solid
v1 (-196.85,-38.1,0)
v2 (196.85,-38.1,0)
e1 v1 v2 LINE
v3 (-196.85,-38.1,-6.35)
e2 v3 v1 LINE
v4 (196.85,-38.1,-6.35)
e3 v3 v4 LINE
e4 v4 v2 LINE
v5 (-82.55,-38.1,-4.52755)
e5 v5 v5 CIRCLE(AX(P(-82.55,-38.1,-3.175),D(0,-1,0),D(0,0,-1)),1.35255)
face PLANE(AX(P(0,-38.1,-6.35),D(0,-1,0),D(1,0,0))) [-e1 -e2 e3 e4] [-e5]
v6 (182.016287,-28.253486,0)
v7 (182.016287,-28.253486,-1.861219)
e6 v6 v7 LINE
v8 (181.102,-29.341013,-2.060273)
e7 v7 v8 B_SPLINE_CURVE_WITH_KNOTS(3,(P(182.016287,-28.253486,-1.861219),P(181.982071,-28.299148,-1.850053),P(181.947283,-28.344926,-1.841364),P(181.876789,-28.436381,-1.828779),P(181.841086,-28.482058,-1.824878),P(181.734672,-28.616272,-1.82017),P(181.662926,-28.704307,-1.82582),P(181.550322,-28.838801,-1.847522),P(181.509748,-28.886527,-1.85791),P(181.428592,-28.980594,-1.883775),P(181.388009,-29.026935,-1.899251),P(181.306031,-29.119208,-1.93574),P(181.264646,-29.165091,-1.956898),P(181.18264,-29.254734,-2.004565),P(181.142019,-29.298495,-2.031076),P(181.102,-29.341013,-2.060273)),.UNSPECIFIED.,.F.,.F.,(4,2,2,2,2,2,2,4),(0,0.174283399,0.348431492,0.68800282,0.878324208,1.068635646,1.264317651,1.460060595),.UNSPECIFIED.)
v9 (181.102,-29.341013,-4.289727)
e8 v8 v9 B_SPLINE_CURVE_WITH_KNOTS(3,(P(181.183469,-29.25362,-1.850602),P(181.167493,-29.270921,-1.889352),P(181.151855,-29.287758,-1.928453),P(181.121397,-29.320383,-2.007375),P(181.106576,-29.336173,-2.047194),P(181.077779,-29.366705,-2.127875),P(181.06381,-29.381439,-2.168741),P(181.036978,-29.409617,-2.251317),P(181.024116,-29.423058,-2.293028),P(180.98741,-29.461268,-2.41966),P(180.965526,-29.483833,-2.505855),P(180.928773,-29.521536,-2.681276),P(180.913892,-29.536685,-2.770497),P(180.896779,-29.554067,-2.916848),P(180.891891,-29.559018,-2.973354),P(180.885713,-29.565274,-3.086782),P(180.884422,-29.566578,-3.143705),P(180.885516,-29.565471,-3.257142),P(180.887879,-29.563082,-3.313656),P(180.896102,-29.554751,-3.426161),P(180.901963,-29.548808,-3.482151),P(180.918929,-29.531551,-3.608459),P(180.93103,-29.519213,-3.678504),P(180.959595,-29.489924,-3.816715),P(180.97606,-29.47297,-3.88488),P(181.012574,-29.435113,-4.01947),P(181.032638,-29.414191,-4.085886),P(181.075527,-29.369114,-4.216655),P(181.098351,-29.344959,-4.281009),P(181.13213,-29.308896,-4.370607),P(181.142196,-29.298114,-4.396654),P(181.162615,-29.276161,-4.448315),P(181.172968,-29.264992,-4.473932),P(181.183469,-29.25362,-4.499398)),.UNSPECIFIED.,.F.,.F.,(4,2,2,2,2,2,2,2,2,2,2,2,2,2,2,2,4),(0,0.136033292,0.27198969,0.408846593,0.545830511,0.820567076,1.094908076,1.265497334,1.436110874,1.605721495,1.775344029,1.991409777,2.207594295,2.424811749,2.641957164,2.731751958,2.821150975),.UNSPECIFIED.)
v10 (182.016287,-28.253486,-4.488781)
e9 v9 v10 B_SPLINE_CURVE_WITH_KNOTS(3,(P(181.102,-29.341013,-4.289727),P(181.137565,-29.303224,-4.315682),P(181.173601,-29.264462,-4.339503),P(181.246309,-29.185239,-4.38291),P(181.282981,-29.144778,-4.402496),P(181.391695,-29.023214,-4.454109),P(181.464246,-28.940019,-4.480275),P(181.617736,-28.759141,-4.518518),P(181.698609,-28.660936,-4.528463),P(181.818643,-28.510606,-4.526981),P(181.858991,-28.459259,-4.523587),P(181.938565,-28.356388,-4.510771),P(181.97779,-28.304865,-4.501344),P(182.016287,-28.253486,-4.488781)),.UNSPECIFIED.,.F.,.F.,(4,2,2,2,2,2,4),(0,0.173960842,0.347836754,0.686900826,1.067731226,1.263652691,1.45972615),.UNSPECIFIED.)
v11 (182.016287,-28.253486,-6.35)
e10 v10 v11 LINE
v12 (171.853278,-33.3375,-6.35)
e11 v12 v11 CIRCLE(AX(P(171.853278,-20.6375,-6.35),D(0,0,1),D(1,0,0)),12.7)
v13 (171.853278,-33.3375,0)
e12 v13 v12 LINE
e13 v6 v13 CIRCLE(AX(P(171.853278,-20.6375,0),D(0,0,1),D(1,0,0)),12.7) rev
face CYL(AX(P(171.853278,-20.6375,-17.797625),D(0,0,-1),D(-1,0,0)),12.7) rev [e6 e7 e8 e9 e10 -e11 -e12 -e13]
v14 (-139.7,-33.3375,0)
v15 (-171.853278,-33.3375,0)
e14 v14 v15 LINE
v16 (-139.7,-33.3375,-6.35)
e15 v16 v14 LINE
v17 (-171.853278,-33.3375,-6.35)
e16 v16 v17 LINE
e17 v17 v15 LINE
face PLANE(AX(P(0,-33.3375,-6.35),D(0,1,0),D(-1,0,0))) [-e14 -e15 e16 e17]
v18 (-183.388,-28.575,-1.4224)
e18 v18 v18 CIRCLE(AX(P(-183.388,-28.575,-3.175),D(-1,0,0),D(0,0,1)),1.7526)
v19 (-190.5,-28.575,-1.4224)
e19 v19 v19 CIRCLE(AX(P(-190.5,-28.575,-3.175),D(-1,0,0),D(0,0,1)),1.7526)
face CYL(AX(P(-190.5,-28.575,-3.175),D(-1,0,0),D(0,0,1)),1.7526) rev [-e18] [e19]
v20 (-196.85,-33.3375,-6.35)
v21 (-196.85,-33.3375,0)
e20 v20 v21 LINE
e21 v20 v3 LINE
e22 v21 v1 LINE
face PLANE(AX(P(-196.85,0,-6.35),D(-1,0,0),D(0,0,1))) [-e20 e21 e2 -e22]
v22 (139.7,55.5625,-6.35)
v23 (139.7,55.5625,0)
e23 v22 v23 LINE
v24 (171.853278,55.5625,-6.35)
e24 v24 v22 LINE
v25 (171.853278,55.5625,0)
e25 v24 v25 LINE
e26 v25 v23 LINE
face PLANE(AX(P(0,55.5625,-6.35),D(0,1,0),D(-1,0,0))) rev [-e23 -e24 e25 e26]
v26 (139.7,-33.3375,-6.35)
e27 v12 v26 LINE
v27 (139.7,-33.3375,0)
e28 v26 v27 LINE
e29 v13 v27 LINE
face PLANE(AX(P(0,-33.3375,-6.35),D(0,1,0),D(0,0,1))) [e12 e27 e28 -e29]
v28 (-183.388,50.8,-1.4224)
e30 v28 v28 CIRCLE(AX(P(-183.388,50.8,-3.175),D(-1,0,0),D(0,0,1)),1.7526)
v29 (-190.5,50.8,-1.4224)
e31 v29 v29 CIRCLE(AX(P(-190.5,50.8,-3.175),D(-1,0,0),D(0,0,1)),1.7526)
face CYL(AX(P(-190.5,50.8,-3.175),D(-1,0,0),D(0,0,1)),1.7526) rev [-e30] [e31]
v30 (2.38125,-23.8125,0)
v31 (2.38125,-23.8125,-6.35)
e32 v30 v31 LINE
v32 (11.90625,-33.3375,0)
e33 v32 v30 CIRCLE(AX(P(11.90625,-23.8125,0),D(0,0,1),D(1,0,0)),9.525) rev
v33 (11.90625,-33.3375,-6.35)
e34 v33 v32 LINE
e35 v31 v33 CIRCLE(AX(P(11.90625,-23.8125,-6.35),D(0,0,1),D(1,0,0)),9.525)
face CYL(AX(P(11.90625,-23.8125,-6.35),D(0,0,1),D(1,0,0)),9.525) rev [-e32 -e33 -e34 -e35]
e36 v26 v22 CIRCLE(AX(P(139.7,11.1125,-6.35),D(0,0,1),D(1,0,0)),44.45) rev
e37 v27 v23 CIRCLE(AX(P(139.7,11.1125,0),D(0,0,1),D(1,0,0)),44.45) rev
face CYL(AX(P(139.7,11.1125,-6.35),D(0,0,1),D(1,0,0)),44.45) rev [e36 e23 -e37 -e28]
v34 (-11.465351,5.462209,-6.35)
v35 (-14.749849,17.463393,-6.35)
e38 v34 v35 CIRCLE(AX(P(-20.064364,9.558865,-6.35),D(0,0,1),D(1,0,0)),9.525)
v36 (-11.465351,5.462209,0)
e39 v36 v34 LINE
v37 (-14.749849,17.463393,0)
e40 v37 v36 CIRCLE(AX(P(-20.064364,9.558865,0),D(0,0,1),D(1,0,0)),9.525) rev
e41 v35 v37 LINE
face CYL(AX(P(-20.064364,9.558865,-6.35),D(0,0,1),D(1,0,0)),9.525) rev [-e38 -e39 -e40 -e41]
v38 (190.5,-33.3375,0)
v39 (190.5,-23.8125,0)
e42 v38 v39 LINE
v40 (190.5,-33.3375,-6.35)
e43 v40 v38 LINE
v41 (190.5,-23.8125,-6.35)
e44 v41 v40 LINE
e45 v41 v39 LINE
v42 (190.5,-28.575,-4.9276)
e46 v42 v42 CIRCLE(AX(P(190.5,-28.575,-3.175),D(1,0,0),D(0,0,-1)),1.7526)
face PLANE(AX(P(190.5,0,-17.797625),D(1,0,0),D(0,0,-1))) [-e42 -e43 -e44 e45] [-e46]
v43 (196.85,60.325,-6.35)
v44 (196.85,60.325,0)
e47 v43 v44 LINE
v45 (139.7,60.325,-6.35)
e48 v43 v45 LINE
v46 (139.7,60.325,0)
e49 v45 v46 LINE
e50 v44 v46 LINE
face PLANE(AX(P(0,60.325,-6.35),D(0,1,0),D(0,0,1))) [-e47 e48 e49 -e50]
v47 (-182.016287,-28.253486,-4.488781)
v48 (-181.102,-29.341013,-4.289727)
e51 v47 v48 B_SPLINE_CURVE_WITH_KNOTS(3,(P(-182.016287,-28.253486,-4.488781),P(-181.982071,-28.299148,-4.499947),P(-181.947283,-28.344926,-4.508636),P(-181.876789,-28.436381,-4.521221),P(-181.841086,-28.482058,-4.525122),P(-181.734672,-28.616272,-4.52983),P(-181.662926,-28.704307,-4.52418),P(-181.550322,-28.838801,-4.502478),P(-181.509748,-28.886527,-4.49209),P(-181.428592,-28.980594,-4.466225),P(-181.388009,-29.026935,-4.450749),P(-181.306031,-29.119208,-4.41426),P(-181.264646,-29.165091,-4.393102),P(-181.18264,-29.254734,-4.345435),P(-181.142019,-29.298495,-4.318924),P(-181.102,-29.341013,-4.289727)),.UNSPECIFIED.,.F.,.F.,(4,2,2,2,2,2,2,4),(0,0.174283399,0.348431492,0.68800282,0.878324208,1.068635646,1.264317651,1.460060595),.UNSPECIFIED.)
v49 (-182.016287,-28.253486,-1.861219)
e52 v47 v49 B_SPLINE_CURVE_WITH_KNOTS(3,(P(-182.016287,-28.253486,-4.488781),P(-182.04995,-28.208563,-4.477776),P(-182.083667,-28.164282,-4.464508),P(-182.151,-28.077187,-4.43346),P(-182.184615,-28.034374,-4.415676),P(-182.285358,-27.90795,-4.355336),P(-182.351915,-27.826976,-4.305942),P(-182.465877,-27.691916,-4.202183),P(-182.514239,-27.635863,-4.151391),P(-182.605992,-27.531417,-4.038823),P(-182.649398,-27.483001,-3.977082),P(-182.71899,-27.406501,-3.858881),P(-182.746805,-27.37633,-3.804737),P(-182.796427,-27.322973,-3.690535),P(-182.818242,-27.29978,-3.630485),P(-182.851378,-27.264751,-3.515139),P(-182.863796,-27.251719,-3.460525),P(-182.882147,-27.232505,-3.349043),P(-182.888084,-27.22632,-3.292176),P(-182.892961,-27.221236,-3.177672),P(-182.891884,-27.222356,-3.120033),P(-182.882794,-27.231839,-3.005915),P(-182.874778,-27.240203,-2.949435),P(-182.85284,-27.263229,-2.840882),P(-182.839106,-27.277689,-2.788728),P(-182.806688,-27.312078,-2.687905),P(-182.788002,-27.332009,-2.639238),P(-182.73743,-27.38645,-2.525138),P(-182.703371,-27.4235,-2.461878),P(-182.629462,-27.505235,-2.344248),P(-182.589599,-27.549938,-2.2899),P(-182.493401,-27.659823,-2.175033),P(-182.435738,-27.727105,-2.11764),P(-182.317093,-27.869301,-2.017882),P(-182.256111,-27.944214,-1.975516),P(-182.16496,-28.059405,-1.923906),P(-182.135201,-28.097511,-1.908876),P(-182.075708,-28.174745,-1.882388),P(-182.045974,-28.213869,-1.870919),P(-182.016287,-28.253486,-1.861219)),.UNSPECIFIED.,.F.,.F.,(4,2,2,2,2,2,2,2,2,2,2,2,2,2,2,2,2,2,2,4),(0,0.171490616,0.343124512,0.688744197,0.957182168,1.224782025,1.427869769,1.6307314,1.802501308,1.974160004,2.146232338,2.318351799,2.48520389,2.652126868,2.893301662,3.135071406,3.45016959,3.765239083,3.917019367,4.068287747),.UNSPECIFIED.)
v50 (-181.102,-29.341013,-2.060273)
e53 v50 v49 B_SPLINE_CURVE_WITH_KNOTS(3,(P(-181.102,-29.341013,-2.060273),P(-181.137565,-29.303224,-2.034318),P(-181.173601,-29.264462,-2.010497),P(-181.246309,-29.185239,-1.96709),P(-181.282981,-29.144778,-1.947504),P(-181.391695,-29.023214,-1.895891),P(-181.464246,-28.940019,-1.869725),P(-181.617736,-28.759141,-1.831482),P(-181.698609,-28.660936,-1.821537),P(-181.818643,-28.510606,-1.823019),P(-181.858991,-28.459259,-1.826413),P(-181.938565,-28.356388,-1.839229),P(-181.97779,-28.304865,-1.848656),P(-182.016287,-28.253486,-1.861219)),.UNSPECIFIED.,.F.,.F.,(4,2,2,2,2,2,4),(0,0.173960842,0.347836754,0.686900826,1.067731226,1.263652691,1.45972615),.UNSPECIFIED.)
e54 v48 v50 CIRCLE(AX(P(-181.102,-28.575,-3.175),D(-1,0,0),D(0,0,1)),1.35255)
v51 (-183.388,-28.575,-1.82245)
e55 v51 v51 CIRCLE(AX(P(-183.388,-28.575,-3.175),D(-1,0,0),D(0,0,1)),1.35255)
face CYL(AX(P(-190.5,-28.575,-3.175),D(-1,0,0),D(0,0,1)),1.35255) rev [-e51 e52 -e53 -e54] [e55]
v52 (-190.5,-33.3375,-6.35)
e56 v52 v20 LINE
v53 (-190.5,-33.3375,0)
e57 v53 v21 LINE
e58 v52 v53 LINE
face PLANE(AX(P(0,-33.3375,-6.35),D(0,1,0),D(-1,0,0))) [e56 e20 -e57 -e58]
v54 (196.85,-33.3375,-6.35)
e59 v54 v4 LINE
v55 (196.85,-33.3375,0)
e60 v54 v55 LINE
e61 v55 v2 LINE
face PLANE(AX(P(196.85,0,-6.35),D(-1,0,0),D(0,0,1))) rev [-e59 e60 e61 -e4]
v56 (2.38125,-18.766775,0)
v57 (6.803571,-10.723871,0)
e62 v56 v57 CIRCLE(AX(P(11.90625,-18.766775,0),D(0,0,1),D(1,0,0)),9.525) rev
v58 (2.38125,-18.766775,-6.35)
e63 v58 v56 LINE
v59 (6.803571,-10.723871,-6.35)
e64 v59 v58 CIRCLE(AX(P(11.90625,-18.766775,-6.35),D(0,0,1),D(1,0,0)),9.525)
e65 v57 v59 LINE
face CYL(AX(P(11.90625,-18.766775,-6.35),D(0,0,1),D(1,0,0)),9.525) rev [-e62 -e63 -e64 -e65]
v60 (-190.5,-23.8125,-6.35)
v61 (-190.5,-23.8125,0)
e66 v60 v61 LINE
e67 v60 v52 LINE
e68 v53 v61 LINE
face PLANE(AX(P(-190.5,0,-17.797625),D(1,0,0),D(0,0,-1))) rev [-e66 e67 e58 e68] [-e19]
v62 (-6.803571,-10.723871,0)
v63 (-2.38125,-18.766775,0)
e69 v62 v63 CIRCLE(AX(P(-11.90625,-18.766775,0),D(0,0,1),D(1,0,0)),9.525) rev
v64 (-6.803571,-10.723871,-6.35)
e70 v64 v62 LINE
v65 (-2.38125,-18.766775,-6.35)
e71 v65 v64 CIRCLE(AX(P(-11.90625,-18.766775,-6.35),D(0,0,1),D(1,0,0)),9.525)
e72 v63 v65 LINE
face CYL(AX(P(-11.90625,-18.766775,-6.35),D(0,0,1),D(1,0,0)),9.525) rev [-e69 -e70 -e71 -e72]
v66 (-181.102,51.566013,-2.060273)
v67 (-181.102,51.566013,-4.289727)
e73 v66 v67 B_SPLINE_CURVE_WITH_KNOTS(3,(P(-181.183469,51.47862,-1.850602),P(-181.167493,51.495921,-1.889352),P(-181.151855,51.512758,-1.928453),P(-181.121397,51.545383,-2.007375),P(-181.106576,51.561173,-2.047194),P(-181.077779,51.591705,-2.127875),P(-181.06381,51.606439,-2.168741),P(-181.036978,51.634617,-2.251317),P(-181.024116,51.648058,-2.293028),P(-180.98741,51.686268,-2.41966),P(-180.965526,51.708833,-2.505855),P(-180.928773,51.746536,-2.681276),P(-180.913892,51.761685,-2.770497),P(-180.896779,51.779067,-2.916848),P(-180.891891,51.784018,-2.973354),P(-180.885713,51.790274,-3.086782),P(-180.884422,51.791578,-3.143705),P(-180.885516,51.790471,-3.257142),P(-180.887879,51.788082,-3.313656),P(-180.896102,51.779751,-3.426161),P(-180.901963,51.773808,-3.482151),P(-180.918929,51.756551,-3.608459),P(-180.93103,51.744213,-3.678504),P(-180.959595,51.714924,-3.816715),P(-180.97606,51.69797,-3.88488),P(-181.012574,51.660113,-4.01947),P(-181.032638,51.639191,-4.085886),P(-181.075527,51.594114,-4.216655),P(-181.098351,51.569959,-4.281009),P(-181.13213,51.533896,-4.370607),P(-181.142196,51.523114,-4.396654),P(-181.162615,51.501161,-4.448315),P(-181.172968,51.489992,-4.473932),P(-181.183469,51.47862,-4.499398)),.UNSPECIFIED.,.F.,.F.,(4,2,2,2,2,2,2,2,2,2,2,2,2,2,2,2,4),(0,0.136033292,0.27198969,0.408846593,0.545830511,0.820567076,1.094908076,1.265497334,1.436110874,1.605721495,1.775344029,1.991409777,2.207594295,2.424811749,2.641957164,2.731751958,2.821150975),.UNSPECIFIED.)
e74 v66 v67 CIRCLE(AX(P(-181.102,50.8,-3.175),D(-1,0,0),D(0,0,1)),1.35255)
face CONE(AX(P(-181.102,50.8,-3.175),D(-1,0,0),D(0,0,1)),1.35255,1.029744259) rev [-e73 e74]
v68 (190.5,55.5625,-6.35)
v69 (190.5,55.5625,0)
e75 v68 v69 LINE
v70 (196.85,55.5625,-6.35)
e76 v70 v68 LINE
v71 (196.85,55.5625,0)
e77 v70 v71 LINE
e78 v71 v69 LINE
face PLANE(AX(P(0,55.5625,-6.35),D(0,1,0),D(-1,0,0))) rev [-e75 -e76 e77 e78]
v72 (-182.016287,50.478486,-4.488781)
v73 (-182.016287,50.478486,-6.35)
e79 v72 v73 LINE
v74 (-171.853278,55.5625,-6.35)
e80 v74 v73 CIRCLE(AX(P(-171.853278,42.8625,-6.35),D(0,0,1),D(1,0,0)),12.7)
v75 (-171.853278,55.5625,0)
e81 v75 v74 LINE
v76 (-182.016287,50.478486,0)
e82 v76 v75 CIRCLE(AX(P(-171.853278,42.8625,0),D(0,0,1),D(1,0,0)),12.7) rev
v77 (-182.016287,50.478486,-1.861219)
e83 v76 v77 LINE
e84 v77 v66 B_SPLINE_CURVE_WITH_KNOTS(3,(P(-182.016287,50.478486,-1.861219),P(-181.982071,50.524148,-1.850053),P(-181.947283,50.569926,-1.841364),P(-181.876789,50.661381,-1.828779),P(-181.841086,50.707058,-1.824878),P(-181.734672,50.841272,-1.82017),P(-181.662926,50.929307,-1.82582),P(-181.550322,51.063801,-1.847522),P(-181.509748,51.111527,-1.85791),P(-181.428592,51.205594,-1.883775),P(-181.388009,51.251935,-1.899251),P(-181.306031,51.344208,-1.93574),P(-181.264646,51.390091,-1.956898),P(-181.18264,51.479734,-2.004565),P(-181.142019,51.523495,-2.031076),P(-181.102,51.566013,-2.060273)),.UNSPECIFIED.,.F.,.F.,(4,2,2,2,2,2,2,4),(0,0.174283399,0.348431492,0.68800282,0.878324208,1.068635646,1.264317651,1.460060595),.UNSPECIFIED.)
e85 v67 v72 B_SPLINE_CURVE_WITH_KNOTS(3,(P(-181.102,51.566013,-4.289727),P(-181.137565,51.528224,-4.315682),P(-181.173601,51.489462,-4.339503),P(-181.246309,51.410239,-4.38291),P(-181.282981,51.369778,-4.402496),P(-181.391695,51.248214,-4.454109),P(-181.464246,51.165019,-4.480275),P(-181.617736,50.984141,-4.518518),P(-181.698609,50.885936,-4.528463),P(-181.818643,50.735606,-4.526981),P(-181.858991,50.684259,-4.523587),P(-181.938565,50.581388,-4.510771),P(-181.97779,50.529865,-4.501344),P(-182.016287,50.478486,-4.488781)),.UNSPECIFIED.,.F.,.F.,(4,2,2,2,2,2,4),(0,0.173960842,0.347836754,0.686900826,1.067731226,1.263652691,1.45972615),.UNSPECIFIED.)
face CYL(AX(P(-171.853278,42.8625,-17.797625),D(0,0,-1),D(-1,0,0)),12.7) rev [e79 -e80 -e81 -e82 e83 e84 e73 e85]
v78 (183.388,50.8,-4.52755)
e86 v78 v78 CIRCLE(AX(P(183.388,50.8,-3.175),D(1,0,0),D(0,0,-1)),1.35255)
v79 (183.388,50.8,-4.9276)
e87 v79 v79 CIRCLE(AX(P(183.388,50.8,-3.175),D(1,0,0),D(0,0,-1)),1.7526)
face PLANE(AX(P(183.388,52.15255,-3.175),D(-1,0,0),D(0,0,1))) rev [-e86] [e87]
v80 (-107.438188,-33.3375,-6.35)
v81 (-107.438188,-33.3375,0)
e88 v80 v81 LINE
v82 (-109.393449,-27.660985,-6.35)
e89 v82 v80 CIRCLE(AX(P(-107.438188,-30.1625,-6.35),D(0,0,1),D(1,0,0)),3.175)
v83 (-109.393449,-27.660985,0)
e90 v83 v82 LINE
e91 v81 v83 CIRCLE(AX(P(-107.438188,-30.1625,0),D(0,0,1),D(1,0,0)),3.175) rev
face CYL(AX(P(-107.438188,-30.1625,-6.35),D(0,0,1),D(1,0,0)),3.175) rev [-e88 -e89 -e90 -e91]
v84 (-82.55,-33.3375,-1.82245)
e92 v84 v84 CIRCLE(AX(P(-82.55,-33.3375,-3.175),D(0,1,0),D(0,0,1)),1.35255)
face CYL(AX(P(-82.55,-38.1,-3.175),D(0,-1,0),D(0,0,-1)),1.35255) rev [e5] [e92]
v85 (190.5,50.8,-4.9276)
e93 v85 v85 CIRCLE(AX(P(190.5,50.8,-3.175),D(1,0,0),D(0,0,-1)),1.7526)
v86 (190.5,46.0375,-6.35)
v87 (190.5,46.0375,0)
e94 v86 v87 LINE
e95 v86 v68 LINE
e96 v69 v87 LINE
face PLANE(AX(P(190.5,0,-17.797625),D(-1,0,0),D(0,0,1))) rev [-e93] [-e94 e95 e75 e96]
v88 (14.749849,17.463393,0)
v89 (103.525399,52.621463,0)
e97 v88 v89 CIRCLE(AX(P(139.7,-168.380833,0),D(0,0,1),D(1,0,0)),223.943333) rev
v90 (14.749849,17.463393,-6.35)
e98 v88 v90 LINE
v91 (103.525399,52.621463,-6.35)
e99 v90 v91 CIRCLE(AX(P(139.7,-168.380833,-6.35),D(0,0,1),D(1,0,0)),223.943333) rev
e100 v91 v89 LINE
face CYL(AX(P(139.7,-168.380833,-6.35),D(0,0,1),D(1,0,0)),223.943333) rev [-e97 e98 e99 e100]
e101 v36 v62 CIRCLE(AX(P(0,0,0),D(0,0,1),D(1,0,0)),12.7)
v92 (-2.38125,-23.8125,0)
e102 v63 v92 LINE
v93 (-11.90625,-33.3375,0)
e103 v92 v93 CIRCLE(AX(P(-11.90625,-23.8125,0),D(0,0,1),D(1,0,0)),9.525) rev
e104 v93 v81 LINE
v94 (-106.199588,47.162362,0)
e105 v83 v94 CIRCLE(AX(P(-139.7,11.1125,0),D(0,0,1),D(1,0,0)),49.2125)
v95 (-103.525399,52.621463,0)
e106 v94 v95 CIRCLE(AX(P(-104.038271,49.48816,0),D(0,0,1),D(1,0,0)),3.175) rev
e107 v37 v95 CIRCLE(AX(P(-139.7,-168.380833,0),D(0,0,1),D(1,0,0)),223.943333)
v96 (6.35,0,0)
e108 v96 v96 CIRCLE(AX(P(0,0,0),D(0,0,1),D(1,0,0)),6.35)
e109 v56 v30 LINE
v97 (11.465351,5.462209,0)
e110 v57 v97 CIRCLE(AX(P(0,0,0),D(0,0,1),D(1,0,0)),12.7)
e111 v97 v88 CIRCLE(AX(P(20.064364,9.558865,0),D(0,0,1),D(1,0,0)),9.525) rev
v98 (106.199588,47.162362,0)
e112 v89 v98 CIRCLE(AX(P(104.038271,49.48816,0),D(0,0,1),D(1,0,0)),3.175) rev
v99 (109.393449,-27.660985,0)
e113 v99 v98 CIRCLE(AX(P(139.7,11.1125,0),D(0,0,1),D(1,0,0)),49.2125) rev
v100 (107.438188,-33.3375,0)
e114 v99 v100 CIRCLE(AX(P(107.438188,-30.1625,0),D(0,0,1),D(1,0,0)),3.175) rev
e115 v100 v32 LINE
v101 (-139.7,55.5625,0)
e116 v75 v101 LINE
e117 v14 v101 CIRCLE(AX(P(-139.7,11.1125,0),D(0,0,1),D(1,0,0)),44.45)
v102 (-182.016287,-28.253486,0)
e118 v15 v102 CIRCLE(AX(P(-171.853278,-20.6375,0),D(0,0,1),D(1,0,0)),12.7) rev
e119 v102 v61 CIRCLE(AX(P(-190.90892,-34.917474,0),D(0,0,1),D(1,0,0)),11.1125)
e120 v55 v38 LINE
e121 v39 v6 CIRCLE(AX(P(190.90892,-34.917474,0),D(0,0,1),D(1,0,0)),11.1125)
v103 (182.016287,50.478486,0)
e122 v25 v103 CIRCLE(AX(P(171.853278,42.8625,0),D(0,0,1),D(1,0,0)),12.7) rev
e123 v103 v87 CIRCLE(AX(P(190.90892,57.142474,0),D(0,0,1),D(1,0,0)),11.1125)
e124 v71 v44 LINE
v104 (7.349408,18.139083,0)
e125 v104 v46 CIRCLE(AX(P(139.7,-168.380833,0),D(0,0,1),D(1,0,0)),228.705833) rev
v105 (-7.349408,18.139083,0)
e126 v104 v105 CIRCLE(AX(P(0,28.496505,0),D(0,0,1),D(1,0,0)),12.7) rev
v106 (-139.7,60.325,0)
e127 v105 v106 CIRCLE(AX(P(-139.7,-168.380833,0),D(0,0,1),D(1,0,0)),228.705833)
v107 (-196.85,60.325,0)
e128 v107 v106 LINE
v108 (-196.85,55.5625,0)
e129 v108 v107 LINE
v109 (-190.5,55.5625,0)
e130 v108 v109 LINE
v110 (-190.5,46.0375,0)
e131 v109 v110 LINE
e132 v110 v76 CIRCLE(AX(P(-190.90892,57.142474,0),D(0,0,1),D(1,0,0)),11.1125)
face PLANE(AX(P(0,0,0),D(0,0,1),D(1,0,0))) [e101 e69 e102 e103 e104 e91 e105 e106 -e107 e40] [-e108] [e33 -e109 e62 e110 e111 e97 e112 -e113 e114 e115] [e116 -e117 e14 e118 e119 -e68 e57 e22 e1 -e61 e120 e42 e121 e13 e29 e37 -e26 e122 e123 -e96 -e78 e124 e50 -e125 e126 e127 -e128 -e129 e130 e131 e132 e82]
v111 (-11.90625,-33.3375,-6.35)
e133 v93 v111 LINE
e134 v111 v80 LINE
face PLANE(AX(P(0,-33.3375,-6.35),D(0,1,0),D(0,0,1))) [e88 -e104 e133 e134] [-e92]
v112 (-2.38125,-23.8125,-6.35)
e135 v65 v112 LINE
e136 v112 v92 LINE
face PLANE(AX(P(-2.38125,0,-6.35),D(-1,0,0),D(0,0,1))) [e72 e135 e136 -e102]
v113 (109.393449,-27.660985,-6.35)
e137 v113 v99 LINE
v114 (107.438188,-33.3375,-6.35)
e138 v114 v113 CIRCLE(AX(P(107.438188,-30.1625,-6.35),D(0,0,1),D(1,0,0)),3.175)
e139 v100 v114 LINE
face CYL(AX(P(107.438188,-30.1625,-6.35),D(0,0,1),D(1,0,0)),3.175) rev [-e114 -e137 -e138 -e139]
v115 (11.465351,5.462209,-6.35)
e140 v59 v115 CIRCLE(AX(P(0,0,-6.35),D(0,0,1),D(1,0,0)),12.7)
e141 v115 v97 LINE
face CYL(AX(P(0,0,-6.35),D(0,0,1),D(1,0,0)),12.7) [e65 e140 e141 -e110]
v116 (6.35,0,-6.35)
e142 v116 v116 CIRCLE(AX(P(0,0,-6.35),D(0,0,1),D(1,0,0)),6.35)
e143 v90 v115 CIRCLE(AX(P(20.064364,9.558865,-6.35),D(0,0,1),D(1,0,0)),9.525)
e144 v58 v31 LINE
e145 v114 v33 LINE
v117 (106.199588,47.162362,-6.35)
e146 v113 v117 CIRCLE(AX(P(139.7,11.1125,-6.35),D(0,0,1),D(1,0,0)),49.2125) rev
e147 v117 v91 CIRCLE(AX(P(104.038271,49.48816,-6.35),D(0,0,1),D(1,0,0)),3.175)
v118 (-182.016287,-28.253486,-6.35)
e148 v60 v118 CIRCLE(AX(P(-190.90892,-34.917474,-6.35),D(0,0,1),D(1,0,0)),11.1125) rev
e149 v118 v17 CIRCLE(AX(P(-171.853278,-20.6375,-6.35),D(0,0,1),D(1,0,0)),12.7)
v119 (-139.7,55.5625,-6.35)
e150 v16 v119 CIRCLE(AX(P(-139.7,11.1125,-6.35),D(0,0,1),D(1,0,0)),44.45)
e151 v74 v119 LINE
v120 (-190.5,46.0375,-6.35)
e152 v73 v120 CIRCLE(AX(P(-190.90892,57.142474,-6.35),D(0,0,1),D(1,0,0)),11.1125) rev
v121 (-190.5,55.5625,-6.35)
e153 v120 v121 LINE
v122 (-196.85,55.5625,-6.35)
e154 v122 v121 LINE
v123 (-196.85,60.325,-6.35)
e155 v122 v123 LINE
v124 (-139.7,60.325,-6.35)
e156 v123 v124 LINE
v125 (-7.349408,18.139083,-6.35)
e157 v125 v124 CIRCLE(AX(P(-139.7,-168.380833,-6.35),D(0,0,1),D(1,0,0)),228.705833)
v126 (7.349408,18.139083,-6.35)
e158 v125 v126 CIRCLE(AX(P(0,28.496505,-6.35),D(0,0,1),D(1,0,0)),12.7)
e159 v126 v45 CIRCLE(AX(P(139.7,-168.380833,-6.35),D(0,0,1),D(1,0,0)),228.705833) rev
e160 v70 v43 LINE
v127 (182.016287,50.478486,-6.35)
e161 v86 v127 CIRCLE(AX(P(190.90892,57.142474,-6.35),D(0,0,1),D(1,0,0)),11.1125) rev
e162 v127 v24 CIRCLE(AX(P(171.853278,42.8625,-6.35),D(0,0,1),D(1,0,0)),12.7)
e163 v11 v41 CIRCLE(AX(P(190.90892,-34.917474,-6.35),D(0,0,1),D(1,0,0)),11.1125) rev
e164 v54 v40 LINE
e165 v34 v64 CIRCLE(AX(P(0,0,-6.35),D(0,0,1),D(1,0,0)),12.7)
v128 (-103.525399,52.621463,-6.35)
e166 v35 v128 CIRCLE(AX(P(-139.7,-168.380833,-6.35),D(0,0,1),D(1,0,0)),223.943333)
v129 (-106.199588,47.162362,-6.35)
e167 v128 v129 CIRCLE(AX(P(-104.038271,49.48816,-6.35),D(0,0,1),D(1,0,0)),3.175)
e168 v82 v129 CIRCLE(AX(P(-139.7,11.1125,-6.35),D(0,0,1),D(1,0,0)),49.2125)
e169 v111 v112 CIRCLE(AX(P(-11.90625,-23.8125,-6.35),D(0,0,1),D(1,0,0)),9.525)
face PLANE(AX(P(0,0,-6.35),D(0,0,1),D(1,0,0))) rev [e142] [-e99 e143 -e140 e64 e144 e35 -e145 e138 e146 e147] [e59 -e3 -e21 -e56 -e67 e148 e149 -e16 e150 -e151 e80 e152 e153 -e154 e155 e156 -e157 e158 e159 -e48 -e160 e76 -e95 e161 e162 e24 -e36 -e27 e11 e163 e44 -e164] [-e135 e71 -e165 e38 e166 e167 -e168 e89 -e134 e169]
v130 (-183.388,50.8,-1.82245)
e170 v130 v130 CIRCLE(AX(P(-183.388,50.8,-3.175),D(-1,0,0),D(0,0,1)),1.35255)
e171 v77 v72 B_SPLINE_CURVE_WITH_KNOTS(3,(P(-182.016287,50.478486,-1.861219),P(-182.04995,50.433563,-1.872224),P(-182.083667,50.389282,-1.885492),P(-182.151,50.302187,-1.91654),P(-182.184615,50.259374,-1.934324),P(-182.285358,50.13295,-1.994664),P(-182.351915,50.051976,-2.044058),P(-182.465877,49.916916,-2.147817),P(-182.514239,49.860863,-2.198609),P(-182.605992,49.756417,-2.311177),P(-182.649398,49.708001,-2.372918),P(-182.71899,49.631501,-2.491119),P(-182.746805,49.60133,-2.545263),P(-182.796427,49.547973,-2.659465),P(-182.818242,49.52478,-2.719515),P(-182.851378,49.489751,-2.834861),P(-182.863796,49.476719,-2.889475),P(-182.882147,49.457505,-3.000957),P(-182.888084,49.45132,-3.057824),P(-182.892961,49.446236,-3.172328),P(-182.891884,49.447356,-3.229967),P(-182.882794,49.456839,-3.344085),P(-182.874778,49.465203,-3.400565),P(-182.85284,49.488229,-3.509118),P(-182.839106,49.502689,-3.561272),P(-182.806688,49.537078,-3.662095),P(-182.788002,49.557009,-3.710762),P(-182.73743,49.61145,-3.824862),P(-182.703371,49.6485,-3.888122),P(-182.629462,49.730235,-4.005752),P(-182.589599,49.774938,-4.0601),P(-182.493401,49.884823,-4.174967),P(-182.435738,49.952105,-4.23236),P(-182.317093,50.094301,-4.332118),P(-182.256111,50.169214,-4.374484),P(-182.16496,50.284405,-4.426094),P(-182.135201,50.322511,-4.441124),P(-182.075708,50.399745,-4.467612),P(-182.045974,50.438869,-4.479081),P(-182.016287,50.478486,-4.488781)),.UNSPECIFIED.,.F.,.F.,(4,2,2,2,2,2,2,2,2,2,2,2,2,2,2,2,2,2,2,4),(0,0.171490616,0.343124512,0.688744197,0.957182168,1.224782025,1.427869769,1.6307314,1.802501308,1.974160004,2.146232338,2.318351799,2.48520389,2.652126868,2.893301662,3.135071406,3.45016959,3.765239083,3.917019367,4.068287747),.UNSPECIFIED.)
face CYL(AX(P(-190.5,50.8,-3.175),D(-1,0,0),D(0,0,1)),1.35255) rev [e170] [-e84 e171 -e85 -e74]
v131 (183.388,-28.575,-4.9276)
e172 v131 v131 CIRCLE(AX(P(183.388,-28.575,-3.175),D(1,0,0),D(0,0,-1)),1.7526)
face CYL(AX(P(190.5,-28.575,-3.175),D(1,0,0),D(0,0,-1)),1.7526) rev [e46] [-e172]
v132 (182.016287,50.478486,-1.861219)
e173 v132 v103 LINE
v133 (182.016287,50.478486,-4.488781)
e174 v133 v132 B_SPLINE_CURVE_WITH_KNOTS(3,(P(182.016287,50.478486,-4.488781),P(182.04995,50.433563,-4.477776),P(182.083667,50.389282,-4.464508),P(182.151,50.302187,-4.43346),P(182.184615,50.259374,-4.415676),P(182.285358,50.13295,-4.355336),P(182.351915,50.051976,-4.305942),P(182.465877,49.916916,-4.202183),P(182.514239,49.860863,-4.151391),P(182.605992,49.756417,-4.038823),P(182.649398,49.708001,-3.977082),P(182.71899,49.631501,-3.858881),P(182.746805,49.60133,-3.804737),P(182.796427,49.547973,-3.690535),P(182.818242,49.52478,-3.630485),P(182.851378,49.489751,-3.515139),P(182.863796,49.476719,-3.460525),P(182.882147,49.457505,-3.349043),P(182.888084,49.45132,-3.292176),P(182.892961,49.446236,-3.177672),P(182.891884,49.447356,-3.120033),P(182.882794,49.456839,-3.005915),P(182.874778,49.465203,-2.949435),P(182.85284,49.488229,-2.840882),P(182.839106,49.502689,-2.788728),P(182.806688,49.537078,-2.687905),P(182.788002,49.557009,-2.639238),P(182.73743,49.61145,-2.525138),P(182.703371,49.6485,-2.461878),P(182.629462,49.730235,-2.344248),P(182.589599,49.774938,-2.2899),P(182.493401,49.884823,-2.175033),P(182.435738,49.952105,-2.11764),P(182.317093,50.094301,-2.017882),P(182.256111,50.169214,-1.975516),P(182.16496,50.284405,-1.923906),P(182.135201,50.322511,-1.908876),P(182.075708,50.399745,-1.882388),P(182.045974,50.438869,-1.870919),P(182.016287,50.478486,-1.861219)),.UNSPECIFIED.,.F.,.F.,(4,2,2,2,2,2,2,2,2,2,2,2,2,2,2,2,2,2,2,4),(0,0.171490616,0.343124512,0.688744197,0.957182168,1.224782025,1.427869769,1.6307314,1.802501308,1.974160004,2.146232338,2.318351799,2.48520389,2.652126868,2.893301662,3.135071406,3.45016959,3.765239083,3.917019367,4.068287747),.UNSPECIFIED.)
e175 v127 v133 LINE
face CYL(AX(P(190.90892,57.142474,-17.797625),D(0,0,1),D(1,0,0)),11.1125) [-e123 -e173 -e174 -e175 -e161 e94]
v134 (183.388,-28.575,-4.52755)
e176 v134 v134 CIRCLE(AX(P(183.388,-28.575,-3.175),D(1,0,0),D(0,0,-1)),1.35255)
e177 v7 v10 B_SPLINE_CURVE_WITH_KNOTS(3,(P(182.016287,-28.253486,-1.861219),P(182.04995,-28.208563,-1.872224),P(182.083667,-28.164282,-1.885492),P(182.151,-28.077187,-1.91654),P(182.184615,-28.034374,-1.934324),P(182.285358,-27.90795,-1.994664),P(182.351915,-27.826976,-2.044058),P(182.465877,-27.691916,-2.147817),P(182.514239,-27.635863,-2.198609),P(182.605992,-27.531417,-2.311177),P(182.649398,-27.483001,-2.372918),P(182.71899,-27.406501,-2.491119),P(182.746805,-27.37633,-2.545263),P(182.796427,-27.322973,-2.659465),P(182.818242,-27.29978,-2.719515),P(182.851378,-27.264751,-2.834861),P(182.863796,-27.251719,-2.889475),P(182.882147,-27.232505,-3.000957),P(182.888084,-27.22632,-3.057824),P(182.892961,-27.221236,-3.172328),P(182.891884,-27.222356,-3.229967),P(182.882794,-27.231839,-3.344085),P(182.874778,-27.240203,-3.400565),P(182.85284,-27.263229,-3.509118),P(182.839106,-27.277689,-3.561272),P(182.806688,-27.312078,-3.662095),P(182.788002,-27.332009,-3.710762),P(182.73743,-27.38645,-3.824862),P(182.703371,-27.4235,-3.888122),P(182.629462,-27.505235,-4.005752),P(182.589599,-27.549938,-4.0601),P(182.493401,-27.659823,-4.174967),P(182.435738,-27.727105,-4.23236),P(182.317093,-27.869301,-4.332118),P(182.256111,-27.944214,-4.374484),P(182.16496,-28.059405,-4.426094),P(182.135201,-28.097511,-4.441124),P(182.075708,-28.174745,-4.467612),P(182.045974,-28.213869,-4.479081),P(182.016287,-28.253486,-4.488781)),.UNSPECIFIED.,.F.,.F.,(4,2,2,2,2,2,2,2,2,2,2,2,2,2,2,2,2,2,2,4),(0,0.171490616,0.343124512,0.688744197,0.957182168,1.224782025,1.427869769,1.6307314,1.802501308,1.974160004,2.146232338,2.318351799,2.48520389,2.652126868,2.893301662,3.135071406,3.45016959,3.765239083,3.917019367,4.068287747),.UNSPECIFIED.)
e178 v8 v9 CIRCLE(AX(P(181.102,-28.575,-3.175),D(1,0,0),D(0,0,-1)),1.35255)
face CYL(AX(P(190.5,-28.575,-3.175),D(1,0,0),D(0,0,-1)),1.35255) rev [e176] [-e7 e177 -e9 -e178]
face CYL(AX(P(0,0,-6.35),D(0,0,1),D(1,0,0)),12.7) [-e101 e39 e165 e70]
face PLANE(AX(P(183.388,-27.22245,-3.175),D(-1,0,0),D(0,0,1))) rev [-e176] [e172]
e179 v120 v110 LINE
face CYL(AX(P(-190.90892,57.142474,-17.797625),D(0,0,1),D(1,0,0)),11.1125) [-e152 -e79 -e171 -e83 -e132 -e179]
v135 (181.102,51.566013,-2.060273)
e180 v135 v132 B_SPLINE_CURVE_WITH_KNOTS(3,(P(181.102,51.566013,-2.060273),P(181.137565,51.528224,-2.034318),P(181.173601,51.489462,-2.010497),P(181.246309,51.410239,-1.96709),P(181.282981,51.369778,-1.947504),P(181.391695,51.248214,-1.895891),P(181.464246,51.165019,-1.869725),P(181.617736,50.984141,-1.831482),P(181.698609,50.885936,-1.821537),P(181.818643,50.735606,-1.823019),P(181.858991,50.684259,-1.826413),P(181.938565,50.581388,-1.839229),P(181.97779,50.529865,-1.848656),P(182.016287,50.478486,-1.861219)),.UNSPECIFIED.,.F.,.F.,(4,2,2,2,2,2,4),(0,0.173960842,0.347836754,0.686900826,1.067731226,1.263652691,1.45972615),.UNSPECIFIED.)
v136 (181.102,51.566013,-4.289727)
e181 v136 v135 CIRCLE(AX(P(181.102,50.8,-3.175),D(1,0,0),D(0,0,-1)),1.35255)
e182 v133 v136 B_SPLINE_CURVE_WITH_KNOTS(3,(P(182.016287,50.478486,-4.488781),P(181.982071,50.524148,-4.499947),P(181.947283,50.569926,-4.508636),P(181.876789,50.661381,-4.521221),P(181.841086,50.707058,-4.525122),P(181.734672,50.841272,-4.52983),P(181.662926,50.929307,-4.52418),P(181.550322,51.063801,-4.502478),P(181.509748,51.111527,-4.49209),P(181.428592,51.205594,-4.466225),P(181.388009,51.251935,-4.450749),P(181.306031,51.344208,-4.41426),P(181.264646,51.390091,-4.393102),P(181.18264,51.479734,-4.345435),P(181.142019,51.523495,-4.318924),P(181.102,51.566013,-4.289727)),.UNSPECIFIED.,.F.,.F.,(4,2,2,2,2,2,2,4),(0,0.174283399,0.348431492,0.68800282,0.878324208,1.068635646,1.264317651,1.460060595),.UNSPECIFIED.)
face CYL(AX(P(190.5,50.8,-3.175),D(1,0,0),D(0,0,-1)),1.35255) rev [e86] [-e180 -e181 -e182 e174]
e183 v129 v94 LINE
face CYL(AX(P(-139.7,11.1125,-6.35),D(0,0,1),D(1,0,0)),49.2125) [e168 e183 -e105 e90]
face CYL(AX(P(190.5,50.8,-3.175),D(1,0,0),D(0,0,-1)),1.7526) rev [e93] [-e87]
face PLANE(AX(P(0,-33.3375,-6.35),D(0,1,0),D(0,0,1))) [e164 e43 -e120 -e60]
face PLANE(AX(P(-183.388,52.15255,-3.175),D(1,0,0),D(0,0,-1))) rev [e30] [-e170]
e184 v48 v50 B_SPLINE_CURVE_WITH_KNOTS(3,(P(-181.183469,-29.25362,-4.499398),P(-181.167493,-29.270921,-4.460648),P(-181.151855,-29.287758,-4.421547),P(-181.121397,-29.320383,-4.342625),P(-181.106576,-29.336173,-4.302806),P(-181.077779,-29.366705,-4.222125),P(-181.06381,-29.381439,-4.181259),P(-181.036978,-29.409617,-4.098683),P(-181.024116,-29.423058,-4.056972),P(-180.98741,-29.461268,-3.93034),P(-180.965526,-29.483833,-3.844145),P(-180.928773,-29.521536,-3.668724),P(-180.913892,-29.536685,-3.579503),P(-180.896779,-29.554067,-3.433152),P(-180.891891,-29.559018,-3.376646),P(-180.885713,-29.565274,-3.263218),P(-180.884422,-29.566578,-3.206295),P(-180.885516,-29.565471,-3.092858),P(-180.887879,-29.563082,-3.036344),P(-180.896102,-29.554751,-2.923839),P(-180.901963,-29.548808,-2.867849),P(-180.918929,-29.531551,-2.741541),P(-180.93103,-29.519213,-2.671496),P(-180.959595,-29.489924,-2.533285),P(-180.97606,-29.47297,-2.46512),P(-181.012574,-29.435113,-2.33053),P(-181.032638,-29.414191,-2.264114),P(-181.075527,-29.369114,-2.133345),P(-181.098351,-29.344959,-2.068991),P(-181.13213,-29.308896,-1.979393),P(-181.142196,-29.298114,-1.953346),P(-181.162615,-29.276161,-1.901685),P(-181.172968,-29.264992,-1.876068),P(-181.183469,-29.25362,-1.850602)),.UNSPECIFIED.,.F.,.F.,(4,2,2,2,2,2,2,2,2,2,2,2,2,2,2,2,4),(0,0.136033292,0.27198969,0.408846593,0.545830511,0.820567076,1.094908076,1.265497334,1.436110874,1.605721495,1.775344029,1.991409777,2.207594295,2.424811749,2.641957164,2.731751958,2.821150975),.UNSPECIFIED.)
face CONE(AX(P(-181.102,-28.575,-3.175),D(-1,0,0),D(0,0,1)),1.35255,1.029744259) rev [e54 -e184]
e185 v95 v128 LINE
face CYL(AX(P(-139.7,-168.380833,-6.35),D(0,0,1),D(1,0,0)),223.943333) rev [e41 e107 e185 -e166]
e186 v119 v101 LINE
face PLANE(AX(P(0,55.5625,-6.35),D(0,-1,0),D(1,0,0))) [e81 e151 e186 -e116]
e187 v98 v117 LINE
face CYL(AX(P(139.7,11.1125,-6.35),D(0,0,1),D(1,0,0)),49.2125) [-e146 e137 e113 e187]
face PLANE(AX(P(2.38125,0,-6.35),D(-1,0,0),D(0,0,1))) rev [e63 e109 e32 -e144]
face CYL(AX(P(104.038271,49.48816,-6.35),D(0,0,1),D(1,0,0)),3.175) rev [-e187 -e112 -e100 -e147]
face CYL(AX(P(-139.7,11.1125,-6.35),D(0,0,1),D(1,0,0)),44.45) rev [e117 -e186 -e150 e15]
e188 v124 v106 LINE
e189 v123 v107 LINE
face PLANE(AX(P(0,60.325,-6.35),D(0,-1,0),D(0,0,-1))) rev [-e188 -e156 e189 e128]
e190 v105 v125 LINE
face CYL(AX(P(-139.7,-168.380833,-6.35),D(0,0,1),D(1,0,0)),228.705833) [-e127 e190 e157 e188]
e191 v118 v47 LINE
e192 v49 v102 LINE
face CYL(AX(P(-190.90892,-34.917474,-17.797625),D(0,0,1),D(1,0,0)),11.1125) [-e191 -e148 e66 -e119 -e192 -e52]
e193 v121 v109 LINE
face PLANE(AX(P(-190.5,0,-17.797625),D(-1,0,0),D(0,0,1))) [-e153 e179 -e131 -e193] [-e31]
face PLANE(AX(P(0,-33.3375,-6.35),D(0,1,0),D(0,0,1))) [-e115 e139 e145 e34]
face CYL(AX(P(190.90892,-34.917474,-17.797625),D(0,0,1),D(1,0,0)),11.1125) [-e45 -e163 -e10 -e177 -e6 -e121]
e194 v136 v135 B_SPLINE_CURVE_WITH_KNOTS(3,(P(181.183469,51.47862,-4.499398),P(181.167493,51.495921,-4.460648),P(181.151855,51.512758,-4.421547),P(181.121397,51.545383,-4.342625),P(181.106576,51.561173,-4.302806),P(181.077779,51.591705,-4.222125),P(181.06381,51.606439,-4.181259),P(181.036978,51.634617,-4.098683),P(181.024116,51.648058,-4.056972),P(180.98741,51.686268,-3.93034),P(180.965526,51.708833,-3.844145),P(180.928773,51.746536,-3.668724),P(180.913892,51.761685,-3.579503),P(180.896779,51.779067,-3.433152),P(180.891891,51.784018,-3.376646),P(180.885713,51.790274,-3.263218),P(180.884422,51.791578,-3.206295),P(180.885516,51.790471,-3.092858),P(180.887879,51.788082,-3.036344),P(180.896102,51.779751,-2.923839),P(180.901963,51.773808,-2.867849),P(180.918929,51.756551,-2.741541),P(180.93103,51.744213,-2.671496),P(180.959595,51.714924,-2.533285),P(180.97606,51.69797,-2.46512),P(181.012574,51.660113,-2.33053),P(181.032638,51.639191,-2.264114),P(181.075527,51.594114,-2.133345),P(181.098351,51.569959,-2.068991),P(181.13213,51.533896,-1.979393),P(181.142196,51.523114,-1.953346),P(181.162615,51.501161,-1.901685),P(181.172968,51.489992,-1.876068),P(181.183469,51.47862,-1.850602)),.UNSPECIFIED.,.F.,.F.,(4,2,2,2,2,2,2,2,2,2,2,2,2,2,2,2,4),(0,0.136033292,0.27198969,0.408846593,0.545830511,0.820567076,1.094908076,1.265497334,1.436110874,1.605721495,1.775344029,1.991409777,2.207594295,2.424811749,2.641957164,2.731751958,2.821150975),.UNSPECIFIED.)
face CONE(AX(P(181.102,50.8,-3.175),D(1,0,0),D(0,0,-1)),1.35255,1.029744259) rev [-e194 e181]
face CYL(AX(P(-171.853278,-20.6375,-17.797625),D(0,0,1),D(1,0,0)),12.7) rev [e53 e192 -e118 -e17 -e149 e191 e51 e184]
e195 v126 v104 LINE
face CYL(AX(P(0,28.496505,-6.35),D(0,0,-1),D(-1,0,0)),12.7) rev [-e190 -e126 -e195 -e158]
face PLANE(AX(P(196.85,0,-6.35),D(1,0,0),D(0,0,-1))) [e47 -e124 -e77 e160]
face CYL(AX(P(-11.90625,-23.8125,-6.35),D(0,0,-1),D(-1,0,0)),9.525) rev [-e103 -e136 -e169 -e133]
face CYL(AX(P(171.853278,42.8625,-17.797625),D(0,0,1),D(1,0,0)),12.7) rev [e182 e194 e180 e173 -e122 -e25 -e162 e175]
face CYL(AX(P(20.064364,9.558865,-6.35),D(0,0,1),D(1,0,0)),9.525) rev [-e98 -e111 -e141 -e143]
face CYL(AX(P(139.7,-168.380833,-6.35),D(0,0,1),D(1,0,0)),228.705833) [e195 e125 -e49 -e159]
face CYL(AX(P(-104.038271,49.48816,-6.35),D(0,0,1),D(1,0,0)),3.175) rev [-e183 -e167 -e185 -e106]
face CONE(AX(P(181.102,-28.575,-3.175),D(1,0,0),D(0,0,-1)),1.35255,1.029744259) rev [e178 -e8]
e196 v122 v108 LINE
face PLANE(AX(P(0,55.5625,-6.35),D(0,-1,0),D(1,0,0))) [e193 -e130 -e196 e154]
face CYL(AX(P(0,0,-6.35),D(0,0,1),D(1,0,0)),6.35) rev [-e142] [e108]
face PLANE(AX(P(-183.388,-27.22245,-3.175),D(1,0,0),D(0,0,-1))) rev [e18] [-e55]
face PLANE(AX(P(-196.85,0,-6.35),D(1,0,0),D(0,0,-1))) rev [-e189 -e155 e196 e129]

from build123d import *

# Parameters (mm, degrees)
SKETCH1_W                      = 6.35
SKETCH1_H                      = 4.7625
SKETCH1_R                      = 12.7
SKETCH1_R_2                    = 6.35
BOSS_EXTRUDE1_DEPTH            = 6.35
SKETCH2_W                      = 6.35
SKETCH2_H                      = 9.525
BOSS_EXTRUDE2_DEPTH            = 6.35
FILLET1_R                      = 12.7
FILLET2_R                      = 11.1125
F_6_32_TAPPED_HOLE1_D          = 2.7051
F_6_32_TAPPED_HOLE1_DEPTH      = 9.398
F_6_32_TAPPED_HOLE1_TIP        = 0.81269403
FILLET3_R                      = 9.525
FILLET4_R                      = 12.7
F_6_32_TAPPED_HOLE2_AT_2_COUNT = 2
F_6_32_TAPPED_HOLE2_AT_2_PITCH = 79.375
FILLET5_R                      = 3.175


with BuildPart() as part:
    # Sketch1 → Boss-Extrude1 (new body)
    # profile 1 of 11: a face of its own
    with BuildSketch(Plane.XY):
        with Locations((-193.675, -35.71875)):
            Rectangle(SKETCH1_W, SKETCH1_H)
    # profile 2 of 11: a face of its own
    with BuildSketch(Plane.XY):
        with Locations((-193.675, 57.94375)):
            Rectangle(SKETCH1_W, SKETCH1_H)
    # profile 3 of 11: a face of its own
    with BuildSketch(Plane.XY):
        with BuildLine():
            Line((-190.5, 55.5625), (-139.7, 55.5625))
            ThreePointArc((-139.7, 55.5625), (-127.904529217, 55.251640636), (-116.141805402, 54.31992556))
            ThreePointArc((-116.141805402, 54.31992556), (-58.142540048, 40.183298939), (-5.938839164, 11.225871431))
            ThreePointArc((-5.938839164, 11.225871431), (-3.059528789, 12.325959743), (0, 12.7))
            ThreePointArc((0, 12.7), (-65.90259045, 48.091568013), (-139.7, 60.325))
            Line((-139.7, 60.325), (-190.5, 60.325))
            Line((-190.5, 60.325), (-190.5, 55.5625))
        make_face()
    # profile 4 of 11: a face of its own
    with BuildSketch(Plane.XY):
        with BuildLine():
            ThreePointArc((-139.7, 55.5625), (-95.25, 11.1125), (-139.7, -33.3375))
            Line((-139.7, -33.3375), (-118.579686171, -33.3375))
            ThreePointArc((-118.579686171, -33.3375), (-90.506521339, 9.744357657), (-116.141805402, 54.31992556))
            ThreePointArc((-116.141805402, 54.31992556), (-127.904529217, 55.251640636), (-139.7, 55.5625))
        make_face()
    # profile 5 of 11: a face of its own
    with BuildSketch(Plane.XY):
        Polygon((190.5, -38.1), (190.5, -33.3375), (-118.579686171, -33.3375), (-190.5, -33.3375), (-190.5, -38.1), align=None)
    # profile 6 of 11: a face of its own
    with BuildSketch(Plane.XY):
        Circle(SKETCH1_R)
        Circle(SKETCH1_R_2, mode=Mode.SUBTRACT)
    # profile 7 of 11: a face of its own
    with BuildSketch(Plane.XY):
        with BuildLine():
            Line((-2.38125, -33.3375), (2.38125, -33.3375))
            Line((2.38125, -33.3375), (2.38125, -12.474760456))
            ThreePointArc((2.38125, -12.474760456), (0, -12.7), (-2.38125, -12.474760456))
            Line((-2.38125, -12.474760456), (-2.38125, -33.3375))
        make_face()
    # profile 8 of 11: a face of its own
    with BuildSketch(Plane.XY):
        with BuildLine():
            ThreePointArc((116.141805402, 54.31992556), (127.904529217, 55.251640636), (139.7, 55.5625))
            Line((139.7, 55.5625), (190.5, 55.5625))
            Line((190.5, 55.5625), (190.5, 60.325))
            Line((190.5, 60.325), (139.7, 60.325))
            ThreePointArc((139.7, 60.325), (65.90259045, 48.091568013), (0, 12.7))
            ThreePointArc((0, 12.7), (3.059528789, 12.325959743), (5.938839164, 11.225871431))
            ThreePointArc((5.938839164, 11.225871431), (58.142540048, 40.183298939), (116.141805402, 54.31992556))
        make_face()
    # profile 9 of 11: a face of its own
    with BuildSketch(Plane.XY):
        with BuildLine():
            Line((118.579686171, -33.3375), (139.7, -33.3375))
            ThreePointArc((139.7, -33.3375), (95.25, 11.1125), (139.7, 55.5625))
            ThreePointArc((139.7, 55.5625), (127.904529217, 55.251640636), (116.141805402, 54.31992556))
            ThreePointArc((116.141805402, 54.31992556), (90.506521339, 9.744357657), (118.579686171, -33.3375))
        make_face()
    # profile 10 of 11: a face of its own
    with BuildSketch(Plane.XY):
        with Locations((193.675, 57.94375)):
            Rectangle(SKETCH1_W, SKETCH1_H)
    # profile 11 of 11: a face of its own
    with BuildSketch(Plane.XY):
        with Locations((193.675, -35.71875)):
            Rectangle(SKETCH1_W, SKETCH1_H)
    extrude(amount=-BOSS_EXTRUDE1_DEPTH)

    # Sketch2 → Boss-Extrude2 (add)
    with BuildSketch(Plane.XY):
        with Locations((-187.325, -28.575)):
            Rectangle(SKETCH2_W, SKETCH2_H)
        with Locations((-187.325, 50.8)):
            Rectangle(SKETCH2_W, SKETCH2_H)
        with Locations((187.325, 50.8)):
            Rectangle(SKETCH2_W, SKETCH2_H)
        with Locations((187.325, -28.575)):
            Rectangle(SKETCH2_W, SKETCH2_H)
    extrude(amount=-BOSS_EXTRUDE2_DEPTH)

    # Fillet1
    # the kernel refuses this fillet: 12.7 mm, written as the material it adds along each edge
    with BuildSketch(Plane(origin=(184.15, -33.3375, 0), x_dir=(-1, 0, 0), z_dir=(0, 0, -1)), Plane(origin=(-184.15, 55.5625, 0), x_dir=(1, 0, 0), z_dir=(0, 0, -1))) as fillet1_piece_1:
        with BuildLine():
            CenterArc((12.296722124, 12.7), FILLET1_R, 194.477512186, 75.522487814)
            Line((0, 9.525), (-0.245934442, 9.4615))
            ThreePointArc((-0.245934442, 9.4615), (-0.254, 4.7625), (-0.254, 0))
            Line((-0.254, 0), (0, -0.254))
            Line((0, -0.254), (12.296722124, -0.254))
            Line((12.296722124, -0.254), (12.296722124, 0))
        make_face()
    extrude(amount=6.35)
    with BuildSketch(Plane(origin=(184.15, 55.5625, 0), x_dir=(-1, 0, 0), z_dir=(0, 0, -1)), Plane(origin=(-184.15, -33.3375, 0), x_dir=(1, 0, 0), z_dir=(0, 0, -1))) as fillet1_piece_2:
        with BuildLine():
            CenterArc((12.296722124, -12.7), FILLET1_R, 90, 75.522487814)
            Line((0, -9.525), (-0.245934442, -9.4615))
            ThreePointArc((-0.245934442, -9.4615), (-0.254, -4.7625), (-0.254, 0))
            Line((-0.254, 0), (0, 0.254))
            Line((0, 0.254), (12.296722124, 0.254))
            Line((12.296722124, 0.254), (12.296722124, 0))
        make_face()
    extrude(amount=6.35)

    # Fillet2
    # the kernel refuses this fillet: 11.1125 mm, written as the material it takes off along each edge
    with BuildSketch(Plane(origin=(184.15, -23.8125, 15.875), x_dir=(1, 0, 0), z_dir=(0, 0, -1))) as fillet2_piece_1:
        with BuildLine():
            CenterArc((6.758920293, 11.10497368), FILLET2_R, 216.847264444, 51.043876357)
            Line((-2.133712835, 4.440985963), (-2.311565498, 4.307706209))
            ThreePointArc((-2.311565498, 4.307706209), (-1.049758647, 2.228707764), (-0.215192637, -0.0555625))
            Line((-0.215192637, -0.0555625), (0, -0.22225))
            ThreePointArc((0, -0.22225), (3.175, -0.22225), (6.341821594, -0.222099474))
            Line((6.341821594, -0.222099474), (6.35, 0))
        make_face()
    extrude(amount=38.1, mode=Mode.SUBTRACT)
    with BuildSketch(Plane(origin=(184.15, 46.0375, 15.875), x_dir=(-0.43306748122172517, 0.9013615016785834, 0), z_dir=(0, 0, -1))) as fillet2_piece_2:
        with BuildLine():
            CenterArc((7.082527166, 10.901433526), FILLET2_R, 207.771247513, 51.043876357)
            Line((-2.749978506, 5.723645536), (-2.946628619, 5.620089776))
            ThreePointArc((-2.946628619, 5.620089776), (-1.575316847, 2.76557352), (-0.200327594, -0.096249248))
            Line((-0.200327594, -0.096249248), (0.043111035, -0.218028671))
            ThreePointArc((0.043111035, -0.218028671), (2.46348771, 0.018968828), (4.883864385, -0.218028671))
            Line((4.883864385, -0.218028671), (4.92697542, 0))
        make_face()
    extrude(amount=38.1, mode=Mode.SUBTRACT)
    with BuildSketch(Plane(origin=(-184.15, -23.8125, 15.875), x_dir=(-1, 0, 0), z_dir=(0, 0, -1))) as fillet2_piece_3:
        with BuildLine():
            CenterArc((6.758920293, -11.10497368), FILLET2_R, 92.108859198, 51.043876357)
            Line((-2.133712835, -4.440985963), (-2.311565498, -4.307706209))
            ThreePointArc((-2.311565498, -4.307706209), (-1.049758647, -2.228707764), (-0.215192637, 0.0555625))
            Line((-0.215192637, 0.0555625), (0, 0.22225))
            ThreePointArc((0, 0.22225), (3.175, 0.22225), (6.341821594, 0.222099474))
            Line((6.341821594, 0.222099474), (6.35, 0))
        make_face()
    extrude(amount=38.1, mode=Mode.SUBTRACT)
    with BuildSketch(Plane(origin=(-184.15, 46.0375, 15.875), x_dir=(0.43306748122172517, 0.9013615016785834, 0), z_dir=(0, 0, -1))) as fillet2_piece_4:
        with BuildLine():
            CenterArc((7.082527166, -10.901433526), FILLET2_R, 101.184876129, 51.043876357)
            Line((-2.749978506, -5.723645536), (-2.946628619, -5.620089776))
            ThreePointArc((-2.946628619, -5.620089776), (-1.575316847, -2.76557352), (-0.200327594, 0.096249248))
            Line((-0.200327594, 0.096249248), (0.043111035, 0.218028671))
            ThreePointArc((0.043111035, 0.218028671), (2.46348771, -0.018968828), (4.883864385, 0.218028671))
            Line((4.883864385, 0.218028671), (4.92697542, 0))
        make_face()
    extrude(amount=38.1, mode=Mode.SUBTRACT)

    # #6-32 Tapped Hole1
    with Locations(Plane(origin=(0, -38.1, 0), x_dir=(-1, 0, 0), z_dir=(0, -1, 0))):
        with Locations((82.55, 3.175)):
            Hole(F_6_32_TAPPED_HOLE1_D / 2, depth=F_6_32_TAPPED_HOLE1_DEPTH)
            with Locations((0, 0, -(F_6_32_TAPPED_HOLE1_DEPTH + F_6_32_TAPPED_HOLE1_TIP / 2))):  # 118° drill point
                Cone(0, F_6_32_TAPPED_HOLE1_D / 2, F_6_32_TAPPED_HOLE1_TIP, mode=Mode.SUBTRACT)

    # Fillet3
    fillet3_edges = [part.edges().sort_by_distance(p)[0] for p in [
        (2.38125, -12.474760456, -3.175),
        (2.38125, -33.3375, -3.175),
        (5.938839164, 11.225871431, -3.175),
        (-2.38125, -33.3375, -3.175),
        (-2.38125, -12.474760456, -3.175),
        (-5.938839164, 11.225871431, -3.175),
    ]]
    fillet(fillet3_edges, radius=FILLET3_R)

    # Fillet4
    fillet4_edges = [part.edges().sort_by_distance(p)[0] for p in [
        (0, 12.7, -3.175),
    ]]
    fillet(fillet4_edges, radius=FILLET4_R)

    # Sketch12 → #6-32 Tapped Hole2 (revolve, cut)
    with BuildSketch(Plane(origin=(190.5, -28.575, -3.175), x_dir=(0, 0, -1), z_dir=(0, 1, 0))):
        Polygon((0, 0), (0, 10.21069403), (1.35255, 9.398), (1.35255, 7.112), (1.7526, 7.112), (1.7526, 0), align=None)
    f_6_32_tapped_hole2 = revolve(axis=Axis((196.85, -28.575, -3.175), (-1, 0, 0)), mode=Mode.SUBTRACT)

    # #6-32 Tapped Hole2 at 2: #6-32 Tapped Hole2 ×2
    with Locations(*[(0, i * F_6_32_TAPPED_HOLE2_AT_2_PITCH, 0) for i in range(1, F_6_32_TAPPED_HOLE2_AT_2_COUNT)]):
        add(f_6_32_tapped_hole2, mode=Mode.SUBTRACT)

    # Mirror1: #6-32 Tapped Hole2 across plane
    add(f_6_32_tapped_hole2.mirror(Plane(origin=(0, 0, 0), x_dir=(0, 0, 1), z_dir=(1, 0, 0))), mode=Mode.SUBTRACT)

    # Mirror1 copy 1 sketch → Mirror1 copy 1 (revolve, cut)
    with BuildSketch(Plane(origin=(-190.5, 50.8, -3.175), x_dir=(0, 0, -1), z_dir=(0, 1, 0))):
        Polygon((0, 0), (0, -10.21069403), (1.35255, -9.398), (1.35255, -7.112), (1.7526, -7.112), (1.7526, 0), align=None)
    revolve(axis=Axis((-196.85, 50.8, -3.175), (-1, 0, 0)), mode=Mode.SUBTRACT)

    # Fillet5
    fillet5_edges = [part.edges().sort_by_distance(p)[0] for p in [
        (118.579686171, -33.3375, -3.175),
        (116.141805402, 54.31992556, -3.175),
        (-116.141805402, 54.31992556, -3.175),
        (-118.579686171, -33.3375, -3.175),
    ]]
    fillet(fillet5_edges, radius=FILLET5_R)


solid = part.part
